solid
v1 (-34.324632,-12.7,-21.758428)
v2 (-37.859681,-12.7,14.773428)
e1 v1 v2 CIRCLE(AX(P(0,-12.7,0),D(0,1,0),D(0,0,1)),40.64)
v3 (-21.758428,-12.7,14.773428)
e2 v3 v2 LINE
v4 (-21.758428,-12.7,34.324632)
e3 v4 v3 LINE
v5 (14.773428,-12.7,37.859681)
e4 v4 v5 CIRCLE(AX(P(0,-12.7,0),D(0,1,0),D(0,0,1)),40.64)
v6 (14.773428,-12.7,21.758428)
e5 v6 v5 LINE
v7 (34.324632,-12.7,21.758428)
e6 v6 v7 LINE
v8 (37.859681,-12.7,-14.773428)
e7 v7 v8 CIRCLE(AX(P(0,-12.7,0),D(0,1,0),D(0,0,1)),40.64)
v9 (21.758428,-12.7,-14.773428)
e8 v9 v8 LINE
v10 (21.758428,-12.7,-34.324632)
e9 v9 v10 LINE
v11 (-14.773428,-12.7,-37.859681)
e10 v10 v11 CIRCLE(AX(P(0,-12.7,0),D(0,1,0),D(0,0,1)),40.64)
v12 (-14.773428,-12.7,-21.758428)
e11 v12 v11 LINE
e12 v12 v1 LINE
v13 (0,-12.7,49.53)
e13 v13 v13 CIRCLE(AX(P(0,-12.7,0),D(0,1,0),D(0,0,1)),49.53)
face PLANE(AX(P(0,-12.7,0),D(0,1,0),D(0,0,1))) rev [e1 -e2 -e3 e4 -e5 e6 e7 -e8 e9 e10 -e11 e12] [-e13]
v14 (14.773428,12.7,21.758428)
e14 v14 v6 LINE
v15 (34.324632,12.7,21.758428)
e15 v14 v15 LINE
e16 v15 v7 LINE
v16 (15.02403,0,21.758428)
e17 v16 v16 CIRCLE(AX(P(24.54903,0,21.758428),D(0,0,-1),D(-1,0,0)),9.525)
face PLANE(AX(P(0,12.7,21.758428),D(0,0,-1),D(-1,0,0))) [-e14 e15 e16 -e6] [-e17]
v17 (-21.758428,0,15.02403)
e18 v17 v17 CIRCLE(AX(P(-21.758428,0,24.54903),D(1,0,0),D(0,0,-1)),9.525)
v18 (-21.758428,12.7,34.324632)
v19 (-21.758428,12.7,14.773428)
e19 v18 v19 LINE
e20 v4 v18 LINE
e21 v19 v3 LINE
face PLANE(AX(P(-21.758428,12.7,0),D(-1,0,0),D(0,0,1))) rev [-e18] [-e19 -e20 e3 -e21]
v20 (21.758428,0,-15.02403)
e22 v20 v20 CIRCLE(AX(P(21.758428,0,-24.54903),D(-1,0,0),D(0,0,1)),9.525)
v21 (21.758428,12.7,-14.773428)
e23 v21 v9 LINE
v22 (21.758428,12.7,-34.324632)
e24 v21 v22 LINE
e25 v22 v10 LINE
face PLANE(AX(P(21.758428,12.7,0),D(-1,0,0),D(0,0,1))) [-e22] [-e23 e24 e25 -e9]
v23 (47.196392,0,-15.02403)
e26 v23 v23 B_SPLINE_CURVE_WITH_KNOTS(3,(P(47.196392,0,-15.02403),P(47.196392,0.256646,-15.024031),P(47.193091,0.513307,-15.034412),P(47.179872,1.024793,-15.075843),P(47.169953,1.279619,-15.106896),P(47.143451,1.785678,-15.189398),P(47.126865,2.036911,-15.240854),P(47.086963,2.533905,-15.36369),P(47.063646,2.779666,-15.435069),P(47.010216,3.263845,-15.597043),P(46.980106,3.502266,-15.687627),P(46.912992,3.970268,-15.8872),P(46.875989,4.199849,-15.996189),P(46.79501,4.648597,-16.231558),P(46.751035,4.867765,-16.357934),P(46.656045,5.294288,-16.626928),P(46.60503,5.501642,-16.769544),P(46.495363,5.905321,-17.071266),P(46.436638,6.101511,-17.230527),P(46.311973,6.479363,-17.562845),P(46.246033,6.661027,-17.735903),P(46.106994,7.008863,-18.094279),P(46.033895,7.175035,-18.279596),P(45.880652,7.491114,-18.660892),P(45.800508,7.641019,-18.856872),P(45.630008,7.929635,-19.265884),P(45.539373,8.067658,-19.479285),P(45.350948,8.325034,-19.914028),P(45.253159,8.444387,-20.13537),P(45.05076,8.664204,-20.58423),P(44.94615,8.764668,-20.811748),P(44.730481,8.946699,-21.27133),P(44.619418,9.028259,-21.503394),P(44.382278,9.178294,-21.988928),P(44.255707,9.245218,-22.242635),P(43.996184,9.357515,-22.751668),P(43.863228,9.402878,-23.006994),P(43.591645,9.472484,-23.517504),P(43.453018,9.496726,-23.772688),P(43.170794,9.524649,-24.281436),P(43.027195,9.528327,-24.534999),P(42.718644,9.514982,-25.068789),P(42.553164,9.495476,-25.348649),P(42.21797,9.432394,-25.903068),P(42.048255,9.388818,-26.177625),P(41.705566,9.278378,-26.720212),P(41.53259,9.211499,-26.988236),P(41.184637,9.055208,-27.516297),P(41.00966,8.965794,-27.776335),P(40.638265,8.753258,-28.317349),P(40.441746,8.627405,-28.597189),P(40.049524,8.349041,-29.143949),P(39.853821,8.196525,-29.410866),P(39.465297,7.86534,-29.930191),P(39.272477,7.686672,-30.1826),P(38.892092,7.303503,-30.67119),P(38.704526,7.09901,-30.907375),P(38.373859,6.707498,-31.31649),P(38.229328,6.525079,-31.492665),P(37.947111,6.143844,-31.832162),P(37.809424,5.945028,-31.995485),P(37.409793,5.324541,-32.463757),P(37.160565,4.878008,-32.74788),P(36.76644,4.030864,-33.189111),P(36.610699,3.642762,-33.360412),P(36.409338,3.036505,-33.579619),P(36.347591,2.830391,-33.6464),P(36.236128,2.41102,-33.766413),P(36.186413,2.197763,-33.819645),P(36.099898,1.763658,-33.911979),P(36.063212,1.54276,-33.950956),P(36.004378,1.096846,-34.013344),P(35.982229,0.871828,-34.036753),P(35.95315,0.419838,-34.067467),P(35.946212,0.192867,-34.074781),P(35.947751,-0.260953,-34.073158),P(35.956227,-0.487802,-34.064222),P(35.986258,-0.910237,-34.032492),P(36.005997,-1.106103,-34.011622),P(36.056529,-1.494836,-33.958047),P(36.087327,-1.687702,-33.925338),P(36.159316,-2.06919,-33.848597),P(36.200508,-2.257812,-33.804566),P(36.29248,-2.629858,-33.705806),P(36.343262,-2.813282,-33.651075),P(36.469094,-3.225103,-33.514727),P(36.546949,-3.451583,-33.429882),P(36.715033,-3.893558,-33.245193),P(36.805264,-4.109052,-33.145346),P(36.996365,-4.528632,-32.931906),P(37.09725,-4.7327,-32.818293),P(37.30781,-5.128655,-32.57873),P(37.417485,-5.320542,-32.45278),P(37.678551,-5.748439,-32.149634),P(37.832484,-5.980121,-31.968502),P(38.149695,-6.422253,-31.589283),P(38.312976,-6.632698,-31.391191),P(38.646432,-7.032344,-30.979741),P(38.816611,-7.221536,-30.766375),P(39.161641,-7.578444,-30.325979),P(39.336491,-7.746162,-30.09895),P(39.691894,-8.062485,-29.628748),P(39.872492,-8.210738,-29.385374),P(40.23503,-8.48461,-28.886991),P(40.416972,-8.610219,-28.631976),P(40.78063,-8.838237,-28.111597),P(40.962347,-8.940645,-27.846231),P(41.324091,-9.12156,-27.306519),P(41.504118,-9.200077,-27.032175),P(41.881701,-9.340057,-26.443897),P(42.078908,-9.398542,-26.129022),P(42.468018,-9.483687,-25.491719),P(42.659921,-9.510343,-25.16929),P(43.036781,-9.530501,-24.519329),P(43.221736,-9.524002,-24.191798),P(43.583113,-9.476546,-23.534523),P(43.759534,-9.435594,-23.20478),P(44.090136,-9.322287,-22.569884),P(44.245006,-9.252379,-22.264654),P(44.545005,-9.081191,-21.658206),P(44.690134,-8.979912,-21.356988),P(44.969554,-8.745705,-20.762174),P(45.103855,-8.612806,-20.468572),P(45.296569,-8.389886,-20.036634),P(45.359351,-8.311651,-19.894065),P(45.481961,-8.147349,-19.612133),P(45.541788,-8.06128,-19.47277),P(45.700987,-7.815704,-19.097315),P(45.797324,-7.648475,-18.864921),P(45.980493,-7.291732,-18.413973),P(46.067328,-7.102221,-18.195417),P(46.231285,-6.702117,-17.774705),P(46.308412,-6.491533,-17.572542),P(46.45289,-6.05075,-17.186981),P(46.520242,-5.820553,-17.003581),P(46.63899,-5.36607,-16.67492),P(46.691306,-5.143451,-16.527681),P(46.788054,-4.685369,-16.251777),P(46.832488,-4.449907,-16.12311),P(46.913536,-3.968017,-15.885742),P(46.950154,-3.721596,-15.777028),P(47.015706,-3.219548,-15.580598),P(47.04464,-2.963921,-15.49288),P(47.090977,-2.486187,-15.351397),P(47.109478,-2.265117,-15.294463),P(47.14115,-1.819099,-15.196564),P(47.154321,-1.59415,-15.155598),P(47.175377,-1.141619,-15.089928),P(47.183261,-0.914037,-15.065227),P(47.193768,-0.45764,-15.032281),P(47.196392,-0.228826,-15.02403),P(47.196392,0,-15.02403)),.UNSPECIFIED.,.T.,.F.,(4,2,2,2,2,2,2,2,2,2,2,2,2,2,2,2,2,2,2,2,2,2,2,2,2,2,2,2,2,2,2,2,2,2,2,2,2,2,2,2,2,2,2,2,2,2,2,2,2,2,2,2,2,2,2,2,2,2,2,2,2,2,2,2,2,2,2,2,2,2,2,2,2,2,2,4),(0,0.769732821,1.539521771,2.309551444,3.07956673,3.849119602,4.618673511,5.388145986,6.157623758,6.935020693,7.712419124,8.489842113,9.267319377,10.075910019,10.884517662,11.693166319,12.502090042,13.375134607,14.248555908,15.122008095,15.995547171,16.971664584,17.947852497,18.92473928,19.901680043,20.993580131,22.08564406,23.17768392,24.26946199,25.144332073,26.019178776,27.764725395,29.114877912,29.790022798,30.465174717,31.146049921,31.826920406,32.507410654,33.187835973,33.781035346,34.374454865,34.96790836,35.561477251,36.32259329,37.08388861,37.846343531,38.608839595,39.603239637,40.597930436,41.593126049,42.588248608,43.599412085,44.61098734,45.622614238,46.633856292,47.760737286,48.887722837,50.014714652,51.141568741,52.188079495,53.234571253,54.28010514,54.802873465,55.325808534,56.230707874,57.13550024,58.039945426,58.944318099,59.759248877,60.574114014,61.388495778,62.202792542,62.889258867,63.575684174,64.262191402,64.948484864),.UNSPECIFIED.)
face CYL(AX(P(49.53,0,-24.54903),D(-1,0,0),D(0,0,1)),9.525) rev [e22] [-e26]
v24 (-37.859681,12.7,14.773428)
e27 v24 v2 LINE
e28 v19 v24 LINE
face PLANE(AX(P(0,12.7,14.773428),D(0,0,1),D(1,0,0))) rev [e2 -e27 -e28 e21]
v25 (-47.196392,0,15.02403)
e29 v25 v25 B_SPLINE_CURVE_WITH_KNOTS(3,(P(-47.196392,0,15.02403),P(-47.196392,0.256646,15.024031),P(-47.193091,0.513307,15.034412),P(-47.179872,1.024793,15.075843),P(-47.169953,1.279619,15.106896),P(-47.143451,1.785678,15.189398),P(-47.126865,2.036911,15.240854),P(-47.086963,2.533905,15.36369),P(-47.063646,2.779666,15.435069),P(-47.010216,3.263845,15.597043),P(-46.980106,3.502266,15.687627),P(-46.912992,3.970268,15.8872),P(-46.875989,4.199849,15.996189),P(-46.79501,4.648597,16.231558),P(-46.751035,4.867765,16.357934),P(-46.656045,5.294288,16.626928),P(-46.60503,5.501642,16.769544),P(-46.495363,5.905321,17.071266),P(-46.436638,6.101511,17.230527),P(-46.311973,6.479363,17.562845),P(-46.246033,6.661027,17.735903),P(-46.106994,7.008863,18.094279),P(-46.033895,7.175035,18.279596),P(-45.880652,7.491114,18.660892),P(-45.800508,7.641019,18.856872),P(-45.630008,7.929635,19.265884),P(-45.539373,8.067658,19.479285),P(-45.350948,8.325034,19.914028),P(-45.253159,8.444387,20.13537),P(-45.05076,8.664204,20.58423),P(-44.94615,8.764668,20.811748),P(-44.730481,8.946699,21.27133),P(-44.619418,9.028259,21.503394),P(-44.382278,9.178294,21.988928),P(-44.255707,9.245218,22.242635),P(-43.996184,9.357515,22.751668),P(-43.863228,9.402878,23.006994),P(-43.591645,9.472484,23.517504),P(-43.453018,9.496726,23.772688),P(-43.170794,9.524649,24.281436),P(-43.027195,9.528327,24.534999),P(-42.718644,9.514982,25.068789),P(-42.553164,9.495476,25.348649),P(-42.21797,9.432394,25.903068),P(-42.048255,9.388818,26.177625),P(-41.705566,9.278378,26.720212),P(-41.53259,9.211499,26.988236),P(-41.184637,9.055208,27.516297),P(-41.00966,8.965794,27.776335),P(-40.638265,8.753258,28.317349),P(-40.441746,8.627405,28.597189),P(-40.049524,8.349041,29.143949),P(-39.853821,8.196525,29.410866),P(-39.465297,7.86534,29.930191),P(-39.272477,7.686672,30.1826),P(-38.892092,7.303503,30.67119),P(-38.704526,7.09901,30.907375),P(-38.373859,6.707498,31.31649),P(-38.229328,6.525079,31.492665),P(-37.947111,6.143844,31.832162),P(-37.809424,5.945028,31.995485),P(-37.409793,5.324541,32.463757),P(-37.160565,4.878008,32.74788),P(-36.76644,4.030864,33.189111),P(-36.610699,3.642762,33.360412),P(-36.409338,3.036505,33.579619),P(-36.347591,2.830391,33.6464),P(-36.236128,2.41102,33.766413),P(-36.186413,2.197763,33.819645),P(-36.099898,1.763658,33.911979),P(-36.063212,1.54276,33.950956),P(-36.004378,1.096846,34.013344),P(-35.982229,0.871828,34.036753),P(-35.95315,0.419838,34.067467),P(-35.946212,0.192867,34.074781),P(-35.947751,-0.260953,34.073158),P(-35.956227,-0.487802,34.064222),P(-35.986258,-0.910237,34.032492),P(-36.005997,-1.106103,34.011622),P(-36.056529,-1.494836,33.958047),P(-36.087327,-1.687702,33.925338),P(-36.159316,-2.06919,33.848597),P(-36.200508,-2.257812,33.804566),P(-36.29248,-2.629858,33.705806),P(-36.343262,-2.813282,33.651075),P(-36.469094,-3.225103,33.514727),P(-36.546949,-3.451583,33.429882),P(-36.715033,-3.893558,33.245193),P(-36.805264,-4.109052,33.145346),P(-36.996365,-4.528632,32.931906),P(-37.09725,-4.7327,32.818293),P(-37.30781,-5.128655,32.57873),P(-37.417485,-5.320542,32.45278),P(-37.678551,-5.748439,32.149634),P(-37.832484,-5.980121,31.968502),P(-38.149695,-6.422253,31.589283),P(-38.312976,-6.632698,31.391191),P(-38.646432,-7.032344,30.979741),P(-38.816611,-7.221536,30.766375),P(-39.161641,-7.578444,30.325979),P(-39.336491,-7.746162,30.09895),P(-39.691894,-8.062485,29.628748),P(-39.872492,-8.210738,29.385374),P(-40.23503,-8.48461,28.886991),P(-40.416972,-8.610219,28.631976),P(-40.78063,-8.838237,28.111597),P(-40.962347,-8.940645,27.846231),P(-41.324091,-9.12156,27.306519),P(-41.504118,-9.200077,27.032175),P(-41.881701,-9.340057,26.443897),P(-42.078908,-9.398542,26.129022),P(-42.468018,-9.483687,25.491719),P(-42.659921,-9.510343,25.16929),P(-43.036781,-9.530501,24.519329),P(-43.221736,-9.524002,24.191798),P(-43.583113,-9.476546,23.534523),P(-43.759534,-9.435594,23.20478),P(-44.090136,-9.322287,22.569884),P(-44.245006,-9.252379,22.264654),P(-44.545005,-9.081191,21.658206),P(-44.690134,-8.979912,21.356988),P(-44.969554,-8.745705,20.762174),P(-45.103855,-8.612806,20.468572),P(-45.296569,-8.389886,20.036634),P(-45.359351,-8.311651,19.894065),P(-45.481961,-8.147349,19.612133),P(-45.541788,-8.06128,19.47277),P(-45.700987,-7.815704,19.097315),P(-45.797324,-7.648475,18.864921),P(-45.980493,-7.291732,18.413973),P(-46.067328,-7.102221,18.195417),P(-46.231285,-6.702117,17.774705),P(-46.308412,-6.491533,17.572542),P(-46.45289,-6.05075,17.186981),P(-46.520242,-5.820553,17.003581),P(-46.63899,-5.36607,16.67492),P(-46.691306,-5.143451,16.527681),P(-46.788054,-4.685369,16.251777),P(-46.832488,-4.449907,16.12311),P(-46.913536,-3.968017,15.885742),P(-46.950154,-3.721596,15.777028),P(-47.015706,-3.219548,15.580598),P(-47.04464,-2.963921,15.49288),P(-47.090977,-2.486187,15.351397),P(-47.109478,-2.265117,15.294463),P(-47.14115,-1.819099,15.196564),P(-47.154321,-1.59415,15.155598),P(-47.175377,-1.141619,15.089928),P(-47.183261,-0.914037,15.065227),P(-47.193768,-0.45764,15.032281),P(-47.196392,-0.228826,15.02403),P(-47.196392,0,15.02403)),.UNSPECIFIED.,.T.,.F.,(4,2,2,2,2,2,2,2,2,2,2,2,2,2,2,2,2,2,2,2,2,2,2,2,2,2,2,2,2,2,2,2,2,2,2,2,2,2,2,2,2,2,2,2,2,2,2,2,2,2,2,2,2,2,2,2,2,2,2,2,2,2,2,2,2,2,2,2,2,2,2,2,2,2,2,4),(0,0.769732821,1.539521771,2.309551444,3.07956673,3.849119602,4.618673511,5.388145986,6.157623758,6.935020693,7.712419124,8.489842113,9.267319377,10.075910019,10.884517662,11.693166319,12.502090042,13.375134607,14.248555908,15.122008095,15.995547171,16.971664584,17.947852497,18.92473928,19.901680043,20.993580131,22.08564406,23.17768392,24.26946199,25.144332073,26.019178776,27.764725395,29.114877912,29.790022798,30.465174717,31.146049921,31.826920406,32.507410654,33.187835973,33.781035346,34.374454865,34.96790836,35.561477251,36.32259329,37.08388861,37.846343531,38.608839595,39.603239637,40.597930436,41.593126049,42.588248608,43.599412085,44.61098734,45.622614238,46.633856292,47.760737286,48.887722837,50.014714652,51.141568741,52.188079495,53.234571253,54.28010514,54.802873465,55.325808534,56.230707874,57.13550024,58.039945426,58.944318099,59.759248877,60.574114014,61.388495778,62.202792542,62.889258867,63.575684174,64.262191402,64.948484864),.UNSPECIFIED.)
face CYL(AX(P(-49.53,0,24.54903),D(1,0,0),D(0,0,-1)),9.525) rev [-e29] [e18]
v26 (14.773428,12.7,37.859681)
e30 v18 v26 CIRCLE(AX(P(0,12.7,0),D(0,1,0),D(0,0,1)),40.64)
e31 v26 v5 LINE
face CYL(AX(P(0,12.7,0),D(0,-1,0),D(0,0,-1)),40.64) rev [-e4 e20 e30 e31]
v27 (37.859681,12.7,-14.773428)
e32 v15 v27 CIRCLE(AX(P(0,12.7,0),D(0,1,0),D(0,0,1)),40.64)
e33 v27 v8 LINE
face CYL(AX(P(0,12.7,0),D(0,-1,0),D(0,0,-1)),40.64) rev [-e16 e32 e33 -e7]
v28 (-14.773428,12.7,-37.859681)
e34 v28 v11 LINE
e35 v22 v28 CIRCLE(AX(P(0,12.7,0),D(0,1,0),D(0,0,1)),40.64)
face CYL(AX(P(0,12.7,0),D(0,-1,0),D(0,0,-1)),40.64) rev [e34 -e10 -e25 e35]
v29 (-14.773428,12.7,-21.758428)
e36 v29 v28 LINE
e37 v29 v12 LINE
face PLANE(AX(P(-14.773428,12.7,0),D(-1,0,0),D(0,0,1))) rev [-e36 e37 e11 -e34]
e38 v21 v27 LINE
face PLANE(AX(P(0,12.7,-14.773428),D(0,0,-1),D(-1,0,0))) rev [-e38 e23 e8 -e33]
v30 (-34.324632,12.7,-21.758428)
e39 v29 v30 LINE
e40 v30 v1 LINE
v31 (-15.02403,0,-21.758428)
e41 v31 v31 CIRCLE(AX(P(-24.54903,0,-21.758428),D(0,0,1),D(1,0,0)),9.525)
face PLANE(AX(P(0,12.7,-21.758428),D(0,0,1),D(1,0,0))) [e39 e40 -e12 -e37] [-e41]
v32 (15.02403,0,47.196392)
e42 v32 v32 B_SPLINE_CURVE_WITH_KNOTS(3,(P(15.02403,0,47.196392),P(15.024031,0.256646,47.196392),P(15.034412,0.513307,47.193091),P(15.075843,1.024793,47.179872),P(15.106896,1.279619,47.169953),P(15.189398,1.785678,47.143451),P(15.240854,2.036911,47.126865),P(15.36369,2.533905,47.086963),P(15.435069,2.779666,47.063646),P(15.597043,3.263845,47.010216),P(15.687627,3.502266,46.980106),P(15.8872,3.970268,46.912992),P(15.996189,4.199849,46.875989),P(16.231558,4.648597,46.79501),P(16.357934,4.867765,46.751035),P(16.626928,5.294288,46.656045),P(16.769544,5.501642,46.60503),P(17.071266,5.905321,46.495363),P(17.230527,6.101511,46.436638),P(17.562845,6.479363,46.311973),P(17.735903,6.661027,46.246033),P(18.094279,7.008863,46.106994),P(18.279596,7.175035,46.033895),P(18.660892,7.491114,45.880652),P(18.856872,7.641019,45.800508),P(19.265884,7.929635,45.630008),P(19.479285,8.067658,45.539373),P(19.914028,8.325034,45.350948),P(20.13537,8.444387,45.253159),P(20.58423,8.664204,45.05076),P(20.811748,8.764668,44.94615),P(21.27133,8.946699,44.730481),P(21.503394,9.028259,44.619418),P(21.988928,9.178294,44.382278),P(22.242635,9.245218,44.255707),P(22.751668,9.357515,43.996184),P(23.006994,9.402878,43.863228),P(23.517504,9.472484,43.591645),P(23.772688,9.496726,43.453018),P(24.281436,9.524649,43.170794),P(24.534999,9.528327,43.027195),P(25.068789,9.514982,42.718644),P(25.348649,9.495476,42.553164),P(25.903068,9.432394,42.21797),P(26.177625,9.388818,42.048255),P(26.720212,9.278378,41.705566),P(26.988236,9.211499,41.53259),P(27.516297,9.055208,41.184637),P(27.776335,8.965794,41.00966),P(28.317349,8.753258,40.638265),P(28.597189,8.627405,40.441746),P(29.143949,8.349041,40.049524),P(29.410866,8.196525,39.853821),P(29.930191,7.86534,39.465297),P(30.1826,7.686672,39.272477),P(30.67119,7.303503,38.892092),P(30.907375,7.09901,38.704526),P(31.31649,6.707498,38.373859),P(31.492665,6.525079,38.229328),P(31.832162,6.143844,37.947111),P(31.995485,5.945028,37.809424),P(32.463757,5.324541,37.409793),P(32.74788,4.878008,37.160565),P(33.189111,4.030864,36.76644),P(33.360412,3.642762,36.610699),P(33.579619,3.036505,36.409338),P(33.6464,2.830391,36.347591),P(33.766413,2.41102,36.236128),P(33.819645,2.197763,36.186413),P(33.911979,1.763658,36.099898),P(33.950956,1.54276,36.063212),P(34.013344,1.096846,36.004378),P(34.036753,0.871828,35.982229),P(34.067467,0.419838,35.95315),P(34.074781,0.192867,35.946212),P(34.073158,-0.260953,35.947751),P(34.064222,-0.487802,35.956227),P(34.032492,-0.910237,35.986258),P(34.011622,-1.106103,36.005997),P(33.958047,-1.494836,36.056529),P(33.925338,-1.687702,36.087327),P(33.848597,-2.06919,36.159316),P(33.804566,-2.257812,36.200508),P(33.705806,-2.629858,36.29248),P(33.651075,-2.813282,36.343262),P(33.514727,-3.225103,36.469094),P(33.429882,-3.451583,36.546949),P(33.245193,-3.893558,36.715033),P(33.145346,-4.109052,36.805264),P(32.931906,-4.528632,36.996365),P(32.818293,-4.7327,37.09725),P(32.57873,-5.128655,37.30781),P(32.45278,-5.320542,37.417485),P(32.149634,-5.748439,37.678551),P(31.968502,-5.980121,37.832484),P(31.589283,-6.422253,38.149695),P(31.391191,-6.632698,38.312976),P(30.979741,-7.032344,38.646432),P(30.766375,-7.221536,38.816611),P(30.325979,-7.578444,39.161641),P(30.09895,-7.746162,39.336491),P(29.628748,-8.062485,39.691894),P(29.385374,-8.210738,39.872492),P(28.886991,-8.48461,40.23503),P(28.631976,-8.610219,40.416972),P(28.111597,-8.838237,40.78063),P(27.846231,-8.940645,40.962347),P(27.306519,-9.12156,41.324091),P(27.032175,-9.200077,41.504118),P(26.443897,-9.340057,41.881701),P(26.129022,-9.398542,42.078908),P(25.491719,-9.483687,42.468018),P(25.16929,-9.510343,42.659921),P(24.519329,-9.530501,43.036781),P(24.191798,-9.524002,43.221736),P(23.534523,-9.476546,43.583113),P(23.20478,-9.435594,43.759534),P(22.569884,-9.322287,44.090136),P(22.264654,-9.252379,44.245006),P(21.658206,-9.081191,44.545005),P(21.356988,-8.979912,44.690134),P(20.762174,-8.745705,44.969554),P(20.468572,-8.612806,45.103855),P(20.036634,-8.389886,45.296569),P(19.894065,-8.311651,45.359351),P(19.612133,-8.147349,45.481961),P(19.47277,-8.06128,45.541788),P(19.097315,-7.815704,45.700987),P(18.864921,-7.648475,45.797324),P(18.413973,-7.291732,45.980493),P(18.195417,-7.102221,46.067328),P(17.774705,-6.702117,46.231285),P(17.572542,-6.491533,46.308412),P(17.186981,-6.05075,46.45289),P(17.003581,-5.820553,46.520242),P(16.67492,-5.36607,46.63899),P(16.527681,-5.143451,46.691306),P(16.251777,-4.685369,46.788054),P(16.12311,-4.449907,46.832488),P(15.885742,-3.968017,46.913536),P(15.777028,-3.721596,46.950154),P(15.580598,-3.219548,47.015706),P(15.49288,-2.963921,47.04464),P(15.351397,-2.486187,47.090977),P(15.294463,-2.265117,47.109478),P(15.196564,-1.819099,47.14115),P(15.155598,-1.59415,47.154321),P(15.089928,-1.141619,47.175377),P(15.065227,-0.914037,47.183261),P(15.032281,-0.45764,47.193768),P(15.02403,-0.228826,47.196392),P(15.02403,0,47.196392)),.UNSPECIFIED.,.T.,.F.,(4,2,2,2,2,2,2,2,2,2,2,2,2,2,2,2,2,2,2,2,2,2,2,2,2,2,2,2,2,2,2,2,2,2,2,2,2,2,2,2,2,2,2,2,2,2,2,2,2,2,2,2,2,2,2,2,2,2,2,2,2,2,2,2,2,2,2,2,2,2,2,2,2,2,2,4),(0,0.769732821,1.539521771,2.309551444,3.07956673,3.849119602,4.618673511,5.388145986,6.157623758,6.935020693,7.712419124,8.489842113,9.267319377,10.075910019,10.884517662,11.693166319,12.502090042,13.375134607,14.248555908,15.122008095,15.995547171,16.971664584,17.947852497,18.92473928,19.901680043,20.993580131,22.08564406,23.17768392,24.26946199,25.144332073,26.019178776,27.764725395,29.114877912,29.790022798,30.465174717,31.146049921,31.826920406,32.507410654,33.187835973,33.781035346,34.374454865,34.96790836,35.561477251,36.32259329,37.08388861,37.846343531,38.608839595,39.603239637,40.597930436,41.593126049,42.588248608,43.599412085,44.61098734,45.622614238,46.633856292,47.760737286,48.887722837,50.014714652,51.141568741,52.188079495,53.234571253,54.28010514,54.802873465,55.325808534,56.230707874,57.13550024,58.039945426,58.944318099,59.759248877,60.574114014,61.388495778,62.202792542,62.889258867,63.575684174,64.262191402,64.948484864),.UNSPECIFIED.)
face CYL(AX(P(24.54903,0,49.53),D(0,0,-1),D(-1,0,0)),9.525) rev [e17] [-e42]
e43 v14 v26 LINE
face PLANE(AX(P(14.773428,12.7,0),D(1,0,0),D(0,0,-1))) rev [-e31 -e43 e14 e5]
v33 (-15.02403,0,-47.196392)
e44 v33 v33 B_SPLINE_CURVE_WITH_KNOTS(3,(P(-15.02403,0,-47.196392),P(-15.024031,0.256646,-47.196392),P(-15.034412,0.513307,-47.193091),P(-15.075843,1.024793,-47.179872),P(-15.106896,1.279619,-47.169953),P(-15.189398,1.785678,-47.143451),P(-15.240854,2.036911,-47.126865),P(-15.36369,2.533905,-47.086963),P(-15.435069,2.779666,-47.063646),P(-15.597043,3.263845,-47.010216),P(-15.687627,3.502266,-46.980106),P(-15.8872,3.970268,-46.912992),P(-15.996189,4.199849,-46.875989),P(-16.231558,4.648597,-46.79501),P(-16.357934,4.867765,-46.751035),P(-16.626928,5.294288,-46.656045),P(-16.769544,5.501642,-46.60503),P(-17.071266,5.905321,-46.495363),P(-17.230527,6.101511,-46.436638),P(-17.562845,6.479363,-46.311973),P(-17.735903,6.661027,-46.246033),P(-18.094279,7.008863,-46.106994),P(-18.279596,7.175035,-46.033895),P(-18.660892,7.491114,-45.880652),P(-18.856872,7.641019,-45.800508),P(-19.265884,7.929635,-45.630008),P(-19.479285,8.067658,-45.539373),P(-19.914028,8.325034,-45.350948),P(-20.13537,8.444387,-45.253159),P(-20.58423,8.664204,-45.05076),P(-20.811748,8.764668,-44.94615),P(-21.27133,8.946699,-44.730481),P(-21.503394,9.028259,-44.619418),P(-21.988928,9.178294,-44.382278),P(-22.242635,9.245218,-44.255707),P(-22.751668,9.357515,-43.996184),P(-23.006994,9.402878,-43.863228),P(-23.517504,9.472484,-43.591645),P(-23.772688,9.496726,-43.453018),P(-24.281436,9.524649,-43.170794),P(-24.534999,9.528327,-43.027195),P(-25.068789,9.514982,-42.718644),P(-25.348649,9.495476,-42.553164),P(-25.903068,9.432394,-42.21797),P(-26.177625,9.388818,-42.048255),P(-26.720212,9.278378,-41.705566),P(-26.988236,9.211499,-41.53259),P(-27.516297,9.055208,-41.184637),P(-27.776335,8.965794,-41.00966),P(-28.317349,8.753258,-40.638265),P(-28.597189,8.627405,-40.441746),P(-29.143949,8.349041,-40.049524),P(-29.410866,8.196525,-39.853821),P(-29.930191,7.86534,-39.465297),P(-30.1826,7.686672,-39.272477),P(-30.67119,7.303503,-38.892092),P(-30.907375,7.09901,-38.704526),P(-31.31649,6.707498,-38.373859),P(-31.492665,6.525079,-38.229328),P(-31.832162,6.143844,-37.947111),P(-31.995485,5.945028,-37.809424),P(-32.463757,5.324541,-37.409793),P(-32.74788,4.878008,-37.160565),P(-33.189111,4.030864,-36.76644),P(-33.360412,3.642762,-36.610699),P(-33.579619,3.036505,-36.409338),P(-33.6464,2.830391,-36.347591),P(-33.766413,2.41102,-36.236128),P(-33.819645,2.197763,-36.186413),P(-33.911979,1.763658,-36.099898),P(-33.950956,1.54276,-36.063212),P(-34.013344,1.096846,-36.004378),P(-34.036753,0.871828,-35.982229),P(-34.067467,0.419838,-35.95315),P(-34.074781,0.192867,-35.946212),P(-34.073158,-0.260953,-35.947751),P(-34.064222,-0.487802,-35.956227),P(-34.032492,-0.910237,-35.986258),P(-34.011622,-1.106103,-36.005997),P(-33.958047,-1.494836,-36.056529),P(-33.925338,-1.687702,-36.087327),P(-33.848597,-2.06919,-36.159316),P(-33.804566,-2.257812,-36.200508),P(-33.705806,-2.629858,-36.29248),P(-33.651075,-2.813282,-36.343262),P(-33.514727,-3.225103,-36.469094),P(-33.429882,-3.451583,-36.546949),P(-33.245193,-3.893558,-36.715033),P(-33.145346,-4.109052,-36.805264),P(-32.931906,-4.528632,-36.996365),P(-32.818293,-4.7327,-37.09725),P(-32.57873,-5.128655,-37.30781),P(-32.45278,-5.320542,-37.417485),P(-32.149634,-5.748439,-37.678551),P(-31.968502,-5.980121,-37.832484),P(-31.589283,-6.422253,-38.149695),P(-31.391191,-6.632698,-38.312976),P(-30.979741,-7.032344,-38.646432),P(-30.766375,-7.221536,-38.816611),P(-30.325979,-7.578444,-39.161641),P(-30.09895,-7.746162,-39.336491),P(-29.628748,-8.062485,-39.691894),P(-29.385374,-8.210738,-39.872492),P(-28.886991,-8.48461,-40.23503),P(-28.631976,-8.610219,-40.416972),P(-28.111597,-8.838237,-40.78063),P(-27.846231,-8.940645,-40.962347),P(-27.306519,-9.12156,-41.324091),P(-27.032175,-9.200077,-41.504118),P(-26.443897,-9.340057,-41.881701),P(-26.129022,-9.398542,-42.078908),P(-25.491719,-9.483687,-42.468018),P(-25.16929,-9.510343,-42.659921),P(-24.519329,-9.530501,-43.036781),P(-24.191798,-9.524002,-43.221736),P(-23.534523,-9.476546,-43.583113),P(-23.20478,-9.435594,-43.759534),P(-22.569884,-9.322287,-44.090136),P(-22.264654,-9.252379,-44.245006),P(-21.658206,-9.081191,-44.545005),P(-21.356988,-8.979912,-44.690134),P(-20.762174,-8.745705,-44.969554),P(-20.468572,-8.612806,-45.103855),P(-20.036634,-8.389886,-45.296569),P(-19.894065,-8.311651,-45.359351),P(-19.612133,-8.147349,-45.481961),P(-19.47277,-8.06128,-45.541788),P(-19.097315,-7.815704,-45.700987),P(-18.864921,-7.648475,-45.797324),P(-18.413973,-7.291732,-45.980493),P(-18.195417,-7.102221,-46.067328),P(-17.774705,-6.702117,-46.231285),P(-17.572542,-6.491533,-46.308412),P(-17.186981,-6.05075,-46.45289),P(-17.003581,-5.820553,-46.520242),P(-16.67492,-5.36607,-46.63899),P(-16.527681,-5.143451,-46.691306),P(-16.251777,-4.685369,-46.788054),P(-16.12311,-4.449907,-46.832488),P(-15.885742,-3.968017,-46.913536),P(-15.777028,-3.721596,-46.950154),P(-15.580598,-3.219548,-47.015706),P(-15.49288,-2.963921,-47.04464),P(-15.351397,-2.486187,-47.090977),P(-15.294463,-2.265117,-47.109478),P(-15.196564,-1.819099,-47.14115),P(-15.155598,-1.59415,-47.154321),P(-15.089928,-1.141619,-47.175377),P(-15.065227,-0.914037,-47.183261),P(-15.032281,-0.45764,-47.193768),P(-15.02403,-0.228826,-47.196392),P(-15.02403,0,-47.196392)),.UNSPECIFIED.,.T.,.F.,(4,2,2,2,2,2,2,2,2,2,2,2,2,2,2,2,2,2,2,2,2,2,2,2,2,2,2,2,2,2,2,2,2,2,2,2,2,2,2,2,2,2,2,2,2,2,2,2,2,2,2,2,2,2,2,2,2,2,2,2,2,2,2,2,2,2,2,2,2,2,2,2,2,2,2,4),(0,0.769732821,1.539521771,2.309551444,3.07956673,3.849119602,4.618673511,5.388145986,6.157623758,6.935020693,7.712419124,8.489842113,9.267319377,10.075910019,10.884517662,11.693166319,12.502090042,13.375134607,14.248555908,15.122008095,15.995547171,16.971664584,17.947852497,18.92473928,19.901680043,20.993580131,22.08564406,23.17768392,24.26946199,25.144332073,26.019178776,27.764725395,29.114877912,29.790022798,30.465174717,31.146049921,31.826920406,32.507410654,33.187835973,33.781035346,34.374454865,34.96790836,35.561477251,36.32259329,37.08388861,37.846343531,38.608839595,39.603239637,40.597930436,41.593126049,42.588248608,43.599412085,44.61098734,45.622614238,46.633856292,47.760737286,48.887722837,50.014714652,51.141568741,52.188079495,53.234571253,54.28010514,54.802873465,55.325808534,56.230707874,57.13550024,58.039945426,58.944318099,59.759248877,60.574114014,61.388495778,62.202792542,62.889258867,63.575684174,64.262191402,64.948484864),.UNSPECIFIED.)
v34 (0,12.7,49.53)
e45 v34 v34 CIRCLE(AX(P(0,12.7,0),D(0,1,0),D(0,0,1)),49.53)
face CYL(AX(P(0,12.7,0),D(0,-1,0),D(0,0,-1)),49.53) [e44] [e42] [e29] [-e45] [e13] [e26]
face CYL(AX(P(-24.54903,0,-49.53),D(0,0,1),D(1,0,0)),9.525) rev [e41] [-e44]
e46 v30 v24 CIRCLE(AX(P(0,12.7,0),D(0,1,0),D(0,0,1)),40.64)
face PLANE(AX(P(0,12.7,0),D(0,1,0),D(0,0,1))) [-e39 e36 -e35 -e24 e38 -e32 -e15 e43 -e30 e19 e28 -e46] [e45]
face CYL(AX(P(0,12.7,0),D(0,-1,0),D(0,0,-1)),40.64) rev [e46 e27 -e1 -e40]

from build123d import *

# Parameters (mm, degrees)
SKETCH1_R           = 49.53
SKETCH1_R_2         = 40.64
BOSS_EXTRUDE1_DEPTH = 12.7
BOSS_EXTRUDE2_DEPTH = 12.7
SKETCH3_R           = 9.525
CUT_EXTRUDE1_DEPTH  = 88.729988813
CIRPATTERN1_COUNT   = 4


with BuildPart() as part:
    # Sketch1 → Boss-Extrude1 (new, symmetric)
    with BuildSketch(Plane(origin=(0, 0, 0), x_dir=(1, 0, 0), z_dir=(0, 1, 0))):
        Circle(SKETCH1_R)
        Circle(SKETCH1_R_2, mode=Mode.SUBTRACT)
    extrude(amount=BOSS_EXTRUDE1_DEPTH, both=True)

    # Sketch2 → Boss-Extrude2 (add, symmetric)
    with BuildSketch(Plane(origin=(0, 0, 0), x_dir=(1, 0, 0), z_dir=(0, 1, 0))):
        with BuildLine():
            Line((43.786890952, -21.758428384), (14.773428494, -21.758428384))
            Line((14.773428494, -21.758428384), (14.773428494, -43.348428384))
            Line((14.773428494, -43.348428384), (22.619345296, -43.348428384))
            ThreePointArc((22.619345296, -43.348428384), (34.913880881, -34.230716423), (43.786890952, -21.758428384))
        make_face()
        with BuildLine():
            Line((-21.758428494, -43.786890898), (-21.758428494, -14.773428384))
            Line((-21.758428494, -14.773428384), (-43.348428494, -14.773428384))
            Line((-43.348428494, -14.773428384), (-43.348428494, -22.619345087))
            ThreePointArc((-43.348428494, -22.619345087), (-34.230716551, -34.913880755), (-21.758428494, -43.786890898))
        make_face()
        with BuildLine():
            Line((21.758428494, 14.773428384), (43.348428494, 14.773428384))
            Line((43.348428494, 14.773428384), (43.348428494, 22.619345087))
            ThreePointArc((43.348428494, 22.619345087), (34.230716551, 34.913880755), (21.758428494, 43.786890898))
            Line((21.758428494, 43.786890898), (21.758428494, 14.773428384))
        make_face()
        with BuildLine():
            Line((-43.786890952, 21.758428384), (-14.773428494, 21.758428384))
            Line((-14.773428494, 21.758428384), (-14.773428494, 43.348428384))
            Line((-14.773428494, 43.348428384), (-22.619345296, 43.348428384))
            ThreePointArc((-22.619345296, 43.348428384), (-34.913880881, 34.230716423), (-43.786890952, 21.758428384))
        make_face()
    extrude(amount=BOSS_EXTRUDE2_DEPTH, both=True)

    # Sketch3 → Cut-Extrude1 (cut, through all)
    with BuildSketch(Plane(origin=(-21.758428494, 0, 0), x_dir=(0, 0, -1), z_dir=(1, 0, 0))):
        with Locations((-24.549030393, 0)):
            Circle(SKETCH3_R)
    cut_extrude1 = extrude(amount=-CUT_EXTRUDE1_DEPTH, mode=Mode.SUBTRACT)

    # CirPattern1: Cut-Extrude1 ×4 about axis
    cirpattern1_axis = Axis((0, 12.7, 0), (0, 1, 0))
    for i in range(1, CIRPATTERN1_COUNT):
        add(cut_extrude1.rotate(cirpattern1_axis, i * 360 / CIRPATTERN1_COUNT), mode=Mode.SUBTRACT)


solid = part.part
